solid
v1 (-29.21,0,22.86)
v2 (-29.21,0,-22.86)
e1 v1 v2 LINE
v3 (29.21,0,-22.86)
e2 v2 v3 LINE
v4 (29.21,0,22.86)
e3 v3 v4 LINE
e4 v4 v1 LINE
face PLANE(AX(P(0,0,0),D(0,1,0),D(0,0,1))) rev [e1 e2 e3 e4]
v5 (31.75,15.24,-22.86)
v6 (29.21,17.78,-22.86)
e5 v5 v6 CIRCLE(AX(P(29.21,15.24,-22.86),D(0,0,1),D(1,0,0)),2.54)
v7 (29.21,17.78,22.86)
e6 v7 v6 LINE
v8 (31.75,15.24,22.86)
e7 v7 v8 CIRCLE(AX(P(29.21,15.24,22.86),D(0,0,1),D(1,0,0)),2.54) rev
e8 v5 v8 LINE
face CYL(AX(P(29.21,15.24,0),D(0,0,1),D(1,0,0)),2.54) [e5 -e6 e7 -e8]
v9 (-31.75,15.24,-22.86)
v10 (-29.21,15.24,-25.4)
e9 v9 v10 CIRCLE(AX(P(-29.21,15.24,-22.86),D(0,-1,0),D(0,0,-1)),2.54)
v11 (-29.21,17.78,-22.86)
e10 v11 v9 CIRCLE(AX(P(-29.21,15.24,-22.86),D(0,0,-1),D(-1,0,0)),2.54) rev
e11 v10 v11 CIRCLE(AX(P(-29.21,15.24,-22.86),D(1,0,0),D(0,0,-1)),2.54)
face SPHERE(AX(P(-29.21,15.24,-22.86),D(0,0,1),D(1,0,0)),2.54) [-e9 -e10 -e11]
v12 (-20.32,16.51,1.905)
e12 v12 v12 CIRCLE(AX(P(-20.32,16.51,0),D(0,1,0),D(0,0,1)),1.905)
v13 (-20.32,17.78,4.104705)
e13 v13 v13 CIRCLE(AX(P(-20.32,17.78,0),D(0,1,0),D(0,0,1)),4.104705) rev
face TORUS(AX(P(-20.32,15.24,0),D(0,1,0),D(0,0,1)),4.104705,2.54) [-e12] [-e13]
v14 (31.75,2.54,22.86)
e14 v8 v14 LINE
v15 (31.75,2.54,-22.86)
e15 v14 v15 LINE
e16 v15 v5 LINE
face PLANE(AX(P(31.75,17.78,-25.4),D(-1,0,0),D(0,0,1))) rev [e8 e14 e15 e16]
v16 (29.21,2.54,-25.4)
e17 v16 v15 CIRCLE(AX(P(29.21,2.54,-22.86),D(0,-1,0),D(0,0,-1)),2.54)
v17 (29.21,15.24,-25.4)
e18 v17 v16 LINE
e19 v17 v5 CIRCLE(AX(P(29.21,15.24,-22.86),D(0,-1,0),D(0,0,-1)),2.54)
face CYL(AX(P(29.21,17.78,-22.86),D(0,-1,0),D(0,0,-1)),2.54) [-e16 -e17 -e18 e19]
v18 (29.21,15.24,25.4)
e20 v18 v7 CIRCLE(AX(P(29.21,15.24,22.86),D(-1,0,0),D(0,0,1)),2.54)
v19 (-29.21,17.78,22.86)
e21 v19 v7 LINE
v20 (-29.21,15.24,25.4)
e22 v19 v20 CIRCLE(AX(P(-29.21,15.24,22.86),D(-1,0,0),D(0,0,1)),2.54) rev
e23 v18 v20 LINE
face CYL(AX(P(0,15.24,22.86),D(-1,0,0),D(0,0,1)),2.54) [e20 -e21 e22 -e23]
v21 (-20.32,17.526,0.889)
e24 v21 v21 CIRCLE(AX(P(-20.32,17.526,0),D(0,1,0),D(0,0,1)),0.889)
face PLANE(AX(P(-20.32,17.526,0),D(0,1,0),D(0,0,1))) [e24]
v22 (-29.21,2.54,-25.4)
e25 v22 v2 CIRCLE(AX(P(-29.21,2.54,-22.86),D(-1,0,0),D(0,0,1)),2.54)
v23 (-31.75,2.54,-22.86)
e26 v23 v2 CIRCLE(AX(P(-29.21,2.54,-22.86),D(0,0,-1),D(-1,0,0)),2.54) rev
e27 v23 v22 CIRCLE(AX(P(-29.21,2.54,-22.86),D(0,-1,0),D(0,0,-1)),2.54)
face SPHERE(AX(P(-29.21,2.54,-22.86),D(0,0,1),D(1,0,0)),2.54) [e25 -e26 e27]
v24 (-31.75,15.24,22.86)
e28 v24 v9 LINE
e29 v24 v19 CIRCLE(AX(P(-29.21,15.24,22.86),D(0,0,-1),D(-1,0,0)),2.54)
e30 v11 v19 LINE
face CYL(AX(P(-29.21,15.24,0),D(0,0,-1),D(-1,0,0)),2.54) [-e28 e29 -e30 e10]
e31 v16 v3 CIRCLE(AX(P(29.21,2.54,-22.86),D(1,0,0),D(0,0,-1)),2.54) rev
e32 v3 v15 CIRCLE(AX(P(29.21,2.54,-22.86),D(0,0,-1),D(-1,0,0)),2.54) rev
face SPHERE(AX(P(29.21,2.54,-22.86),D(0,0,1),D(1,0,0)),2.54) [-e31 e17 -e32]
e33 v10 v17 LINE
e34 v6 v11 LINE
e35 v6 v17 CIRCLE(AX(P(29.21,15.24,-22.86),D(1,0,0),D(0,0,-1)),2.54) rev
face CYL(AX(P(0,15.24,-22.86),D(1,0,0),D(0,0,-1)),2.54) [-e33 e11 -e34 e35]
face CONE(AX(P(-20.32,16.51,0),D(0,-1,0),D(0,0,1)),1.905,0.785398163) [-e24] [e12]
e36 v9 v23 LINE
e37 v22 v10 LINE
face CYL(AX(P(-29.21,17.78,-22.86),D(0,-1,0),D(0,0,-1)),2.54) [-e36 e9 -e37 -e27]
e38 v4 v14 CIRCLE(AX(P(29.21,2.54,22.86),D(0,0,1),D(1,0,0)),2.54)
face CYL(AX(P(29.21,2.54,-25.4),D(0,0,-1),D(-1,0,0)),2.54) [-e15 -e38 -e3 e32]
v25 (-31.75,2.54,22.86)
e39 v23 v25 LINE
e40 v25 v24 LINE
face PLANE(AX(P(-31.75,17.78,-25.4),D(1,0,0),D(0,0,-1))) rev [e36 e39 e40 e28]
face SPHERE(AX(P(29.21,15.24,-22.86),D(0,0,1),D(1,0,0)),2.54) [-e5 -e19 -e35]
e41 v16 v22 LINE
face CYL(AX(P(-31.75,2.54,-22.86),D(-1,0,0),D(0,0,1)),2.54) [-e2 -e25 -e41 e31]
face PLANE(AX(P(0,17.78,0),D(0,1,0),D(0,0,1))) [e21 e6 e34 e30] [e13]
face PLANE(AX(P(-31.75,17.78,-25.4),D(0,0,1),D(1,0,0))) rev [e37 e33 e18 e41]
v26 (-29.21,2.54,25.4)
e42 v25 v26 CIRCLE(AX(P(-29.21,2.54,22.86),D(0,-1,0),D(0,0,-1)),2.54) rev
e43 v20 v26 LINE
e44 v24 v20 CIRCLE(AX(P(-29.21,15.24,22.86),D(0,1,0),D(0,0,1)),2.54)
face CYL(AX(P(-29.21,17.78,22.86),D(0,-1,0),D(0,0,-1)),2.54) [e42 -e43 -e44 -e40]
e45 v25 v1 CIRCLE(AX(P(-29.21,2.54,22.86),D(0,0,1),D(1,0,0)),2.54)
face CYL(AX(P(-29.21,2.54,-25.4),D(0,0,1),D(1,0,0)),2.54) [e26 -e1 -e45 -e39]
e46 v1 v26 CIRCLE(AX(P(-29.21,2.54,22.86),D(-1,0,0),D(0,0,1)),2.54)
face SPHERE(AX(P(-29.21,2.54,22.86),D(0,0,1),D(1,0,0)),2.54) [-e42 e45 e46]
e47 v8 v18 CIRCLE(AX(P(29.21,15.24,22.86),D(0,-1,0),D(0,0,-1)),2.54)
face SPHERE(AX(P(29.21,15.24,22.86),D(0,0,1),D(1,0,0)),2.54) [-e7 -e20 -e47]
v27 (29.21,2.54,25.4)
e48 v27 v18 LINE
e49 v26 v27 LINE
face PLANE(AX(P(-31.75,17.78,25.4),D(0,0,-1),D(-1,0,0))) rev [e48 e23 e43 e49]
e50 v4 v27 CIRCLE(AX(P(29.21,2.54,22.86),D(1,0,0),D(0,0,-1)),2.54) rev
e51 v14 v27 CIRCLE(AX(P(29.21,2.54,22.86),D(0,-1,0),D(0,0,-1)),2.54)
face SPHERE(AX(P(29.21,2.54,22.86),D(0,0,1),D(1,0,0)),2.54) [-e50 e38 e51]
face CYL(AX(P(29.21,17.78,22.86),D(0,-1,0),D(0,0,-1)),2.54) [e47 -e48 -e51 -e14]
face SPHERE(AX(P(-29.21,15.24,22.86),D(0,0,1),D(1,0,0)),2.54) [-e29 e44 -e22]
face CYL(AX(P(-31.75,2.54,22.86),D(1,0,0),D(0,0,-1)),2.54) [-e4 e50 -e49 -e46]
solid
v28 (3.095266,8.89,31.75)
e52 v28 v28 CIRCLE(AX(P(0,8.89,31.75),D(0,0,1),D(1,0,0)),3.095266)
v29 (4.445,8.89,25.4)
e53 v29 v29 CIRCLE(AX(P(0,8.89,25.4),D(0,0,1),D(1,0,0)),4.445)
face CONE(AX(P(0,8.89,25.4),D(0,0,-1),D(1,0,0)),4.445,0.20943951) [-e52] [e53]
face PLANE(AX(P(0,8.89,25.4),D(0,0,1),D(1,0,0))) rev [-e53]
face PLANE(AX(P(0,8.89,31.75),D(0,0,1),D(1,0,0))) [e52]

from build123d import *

# Parameters (mm, degrees)
SKETCH1_W           = 63.5
SKETCH1_H           = 50.8
BOSS_EXTRUDE1_DEPTH = 17.78
SKETCH2_R           = 4.445
BOSS_EXTRUDE2_DEPTH = 6.35
BOSS_EXTRUDE2_TAPER = 12
SKETCH3_R           = 1.905
CUT_EXTRUDE1_DEPTH  = 1.27
SKETCH4_R           = 1.905
BOSS_EXTRUDE3_DEPTH = 1.016
BOSS_EXTRUDE3_TAPER = 45
FILLET1_R           = 2.54
FILLET2_R           = 2.54


with BuildPart() as part:
    # Sketch1 → Boss-Extrude1 (new body)
    with BuildSketch(Plane(origin=(0, 0, 0), x_dir=(1, 0, 0), z_dir=(0, 1, 0))):
        Rectangle(SKETCH1_W, SKETCH1_H)
    extrude(amount=BOSS_EXTRUDE1_DEPTH)

    # Sketch3 → Cut-Extrude1 (cut)
    with BuildSketch(Plane(origin=(0, 17.78, 0), x_dir=(1, 0, 0), z_dir=(0, 1, 0))):
        with Locations(Location((-20.32, 0, 0), (0, 0, 270))):
            Circle(SKETCH3_R)
    extrude(amount=-CUT_EXTRUDE1_DEPTH, mode=Mode.SUBTRACT)

    # Sketch4 → Boss-Extrude3 (add)
    with BuildSketch(Plane(origin=(0, 16.51, 0), x_dir=(1, 0, 0), z_dir=(0, 1, 0))):
        with Locations(Location((-20.32, 0, 0), (0, 0, 270))):
            Circle(SKETCH4_R)
    extrude(amount=BOSS_EXTRUDE3_DEPTH, taper=BOSS_EXTRUDE3_TAPER)

    # Fillet1
    # the kernel refuses this fillet: 2.54 mm, written as the material it takes off along each edge
    with BuildSketch(Plane(origin=(-31.75, 17.78, 31.75), x_dir=(0, -1, 0), z_dir=(0, 0, -1)), Plane(origin=(31.75, 17.78, -31.75), x_dir=(0, -1, 0), z_dir=(0, 0, 1))) as fillet1_piece_1:
        with BuildLine():
            CenterArc((FILLET1_R, -FILLET1_R), FILLET1_R, 90, 90)
            Line((0, -FILLET1_R), (0, 0))
            Line((0, 0), (FILLET1_R, 0))
        make_face()
    extrude(amount=63.5, mode=Mode.SUBTRACT)
    with BuildSketch(Plane(origin=(38.1, 17.78, 25.4), x_dir=(0, 0, -1), z_dir=(-1, 0, 0))) as fillet1_piece_2:
        with BuildLine():
            CenterArc((FILLET1_R, FILLET1_R), FILLET1_R, 180, 90)
            Line((0, FILLET1_R), (0, 0))
            Line((0, 0), (FILLET1_R, 0))
        make_face()
    extrude(amount=76.2, mode=Mode.SUBTRACT)
    with BuildSketch(Plane(origin=(-20.32, 17.78, 0), x_dir=(0, 0, 1), z_dir=(-1, 0, 0))) as fillet1_piece_3:
        with BuildLine():
            CenterArc((4.104704526, -2.54), FILLET1_R, 90, 60)
            Line((1.905, -1.27), (1.905, 0))
            Line((1.905, 0), (4.104704526, 0))
        make_face()
    revolve(axis=Axis((-20.32, 17.78, 0), (0, 1, 0)), mode=Mode.SUBTRACT)
    with BuildSketch(Plane(origin=(-38.1, 17.78, -25.4), x_dir=(0, -1, 0), z_dir=(1, 0, 0))) as fillet1_piece_4:
        with BuildLine():
            CenterArc((FILLET1_R, -FILLET1_R), FILLET1_R, 90, 90)
            Line((0, -FILLET1_R), (0, 0))
            Line((0, 0), (FILLET1_R, 0))
        make_face()
    extrude(amount=76.2, mode=Mode.SUBTRACT)

    # Fillet2
    # the kernel refuses this fillet: 2.54 mm, written as the material it takes off along each edge
    with BuildSketch(Plane(origin=(-29.21, 15.24, -22.86), x_dir=(-1, 0, 0), z_dir=(0, 0, -1))) as fillet2_piece_1_section:
        Polygon((0, 0), (FILLET2_R, 0), (FILLET2_R, FILLET2_R), (0, FILLET2_R), align=None)
    fillet2_piece_1 = extrude(amount=FILLET2_R, mode=Mode.PRIVATE)
    fillet2_piece_1 = fillet2_piece_1 - Plane(origin=(-29.21, 15.24, -22.86), x_dir=(0.7071067811865475, -0.7071067811865475, 0), z_dir=(0, 0, -1)) * Sphere(FILLET2_R, mode=Mode.PRIVATE)
    add(fillet2_piece_1, mode=Mode.SUBTRACT)
    with BuildSketch(Plane(origin=(29.21, 15.24, -22.86), x_dir=(1, 0, 0), z_dir=(0, 0, -1))) as fillet2_piece_2_section:
        Polygon((0, 0), (FILLET2_R, 0), (FILLET2_R, -FILLET2_R), (0, -FILLET2_R), align=None)
    fillet2_piece_2 = extrude(amount=FILLET2_R, mode=Mode.PRIVATE)
    fillet2_piece_2 = fillet2_piece_2 - Plane(origin=(29.21, 15.24, -22.86), x_dir=(-0.7071067811865475, -0.7071067811865475, 0), z_dir=(0, 0, -1)) * Sphere(FILLET2_R, mode=Mode.PRIVATE)
    add(fillet2_piece_2, mode=Mode.SUBTRACT)
    with BuildSketch(Plane(origin=(-29.21, 15.24, 22.86), x_dir=(0, 0, 1), z_dir=(-1, 0, 0))) as fillet2_piece_3_section:
        Polygon((0, 0), (FILLET2_R, 0), (FILLET2_R, FILLET2_R), (0, FILLET2_R), align=None)
    fillet2_piece_3 = extrude(amount=FILLET2_R, mode=Mode.PRIVATE)
    fillet2_piece_3 = fillet2_piece_3 - Plane(origin=(-29.21, 15.24, 22.86), x_dir=(0, -0.7071067811865475, -0.7071067811865475), z_dir=(-1, 0, 0)) * Sphere(FILLET2_R, mode=Mode.PRIVATE)
    add(fillet2_piece_3, mode=Mode.SUBTRACT)
    with BuildSketch(Plane(origin=(29.21, 15.24, 22.86), x_dir=(0, 0, 1), z_dir=(1, 0, 0))) as fillet2_piece_4_section:
        Polygon((0, 0), (FILLET2_R, 0), (FILLET2_R, -FILLET2_R), (0, -FILLET2_R), align=None)
    fillet2_piece_4 = extrude(amount=FILLET2_R, mode=Mode.PRIVATE)
    fillet2_piece_4 = fillet2_piece_4 - Plane(origin=(29.21, 15.24, 22.86), x_dir=(0, -0.7071067811865475, -0.7071067811865475), z_dir=(1, 0, 0)) * Sphere(FILLET2_R, mode=Mode.PRIVATE)
    add(fillet2_piece_4, mode=Mode.SUBTRACT)
    with BuildSketch(Plane(origin=(29.21, 2.54, 22.86), x_dir=(1, 0, 0), z_dir=(0, -1, 0))) as fillet2_piece_5_section:
        Polygon((0, 0), (FILLET2_R, 0), (FILLET2_R, FILLET2_R), (0, FILLET2_R), align=None)
    fillet2_piece_5 = extrude(amount=FILLET2_R, mode=Mode.PRIVATE)
    fillet2_piece_5 = fillet2_piece_5 - Plane(origin=(29.21, 2.54, 22.86), x_dir=(-0.7071067811865475, 0, -0.7071067811865475), z_dir=(0, -1, 0)) * Sphere(FILLET2_R, mode=Mode.PRIVATE)
    add(fillet2_piece_5, mode=Mode.SUBTRACT)
    with BuildSketch(Plane(origin=(-29.21, 2.54, 22.86), x_dir=(-1, 0, 0), z_dir=(0, -1, 0))) as fillet2_piece_6_section:
        Polygon((0, 0), (FILLET2_R, 0), (FILLET2_R, -FILLET2_R), (0, -FILLET2_R), align=None)
    fillet2_piece_6 = extrude(amount=FILLET2_R, mode=Mode.PRIVATE)
    fillet2_piece_6 = fillet2_piece_6 - Plane(origin=(-29.21, 2.54, 22.86), x_dir=(0.7071067811865475, 0, -0.7071067811865477), z_dir=(0, -1, 0)) * Sphere(FILLET2_R, mode=Mode.PRIVATE)
    add(fillet2_piece_6, mode=Mode.SUBTRACT)
    with BuildSketch(Plane(origin=(-29.21, 2.54, -22.86), x_dir=(0, -1, 0), z_dir=(0, 0, -1))) as fillet2_piece_7_section:
        Polygon((0, 0), (FILLET2_R, 0), (FILLET2_R, FILLET2_R), (0, FILLET2_R), align=None)
    fillet2_piece_7 = extrude(amount=FILLET2_R, mode=Mode.PRIVATE)
    fillet2_piece_7 = fillet2_piece_7 - Plane(origin=(-29.21, 2.54, -22.86), x_dir=(0.7071067811865475, 0.7071067811865475, 0), z_dir=(0, 0, -1)) * Sphere(FILLET2_R, mode=Mode.PRIVATE)
    add(fillet2_piece_7, mode=Mode.SUBTRACT)
    with BuildSketch(Plane(origin=(29.21, 2.54, -22.86), x_dir=(0, -1, 0), z_dir=(0, 0, -1))) as fillet2_piece_8_section:
        Polygon((0, 0), (FILLET2_R, 0), (FILLET2_R, -FILLET2_R), (0, -FILLET2_R), align=None)
    fillet2_piece_8 = extrude(amount=FILLET2_R, mode=Mode.PRIVATE)
    fillet2_piece_8 = fillet2_piece_8 - Plane(origin=(29.21, 2.54, -22.86), x_dir=(-0.7071067811865475, 0.7071067811865475, 0), z_dir=(0, 0, -1)) * Sphere(FILLET2_R, mode=Mode.PRIVATE)
    add(fillet2_piece_8, mode=Mode.SUBTRACT)
    with BuildSketch(Plane(origin=(31.75, 2.54, 25.4), x_dir=(0, 0, -1), z_dir=(0, 1, 0)), Plane(origin=(31.75, 2.54, -25.4), x_dir=(-1, 0, 0), z_dir=(0, 1, 0))) as fillet2_piece_9:
        with BuildLine():
            CenterArc((FILLET2_R, FILLET2_R), FILLET2_R, 180, 90)
            Line((0, FILLET2_R), (0, 0))
            Line((0, 0), (FILLET2_R, 0))
        make_face()
    extrude(amount=12.7, mode=Mode.SUBTRACT)
    with BuildSketch(Plane(origin=(-31.75, 2.54, 25.4), x_dir=(0, 0, -1), z_dir=(0, 1, 0)), Plane(origin=(-31.75, 2.54, -25.4), x_dir=(1, 0, 0), z_dir=(0, 1, 0))) as fillet2_piece_10:
        with BuildLine():
            CenterArc((FILLET2_R, -FILLET2_R), FILLET2_R, 90, 90)
            Line((0, -FILLET2_R), (0, 0))
            Line((0, 0), (FILLET2_R, 0))
        make_face()
    extrude(amount=12.7, mode=Mode.SUBTRACT)
    with BuildSketch(Plane(origin=(29.21, 0, 25.4), x_dir=(0, 0, -1), z_dir=(-1, 0, 0))) as fillet2_piece_11:
        with BuildLine():
            CenterArc((FILLET2_R, -FILLET2_R), FILLET2_R, 90, 90)
            Line((0, -FILLET2_R), (0, 0))
            Line((0, 0), (FILLET2_R, 0))
        make_face()
    extrude(amount=58.42, mode=Mode.SUBTRACT)
    with BuildSketch(Plane(origin=(-31.75, 0, 22.86), x_dir=(1, 0, 0), z_dir=(0, 0, -1)), Plane(origin=(31.75, 0, -22.86), x_dir=(-1, 0, 0), z_dir=(0, 0, 1))) as fillet2_piece_12:
        with BuildLine():
            CenterArc((FILLET2_R, -FILLET2_R), FILLET2_R, 90, 90)
            Line((0, -FILLET2_R), (0, 0))
            Line((0, 0), (FILLET2_R, 0))
        make_face()
    extrude(amount=45.72, mode=Mode.SUBTRACT)
    with BuildSketch(Plane(origin=(-29.21, 0, -25.4), x_dir=(0, 1, 0), z_dir=(1, 0, 0))) as fillet2_piece_13:
        with BuildLine():
            CenterArc((FILLET2_R, FILLET2_R), FILLET2_R, 180, 90)
            Line((0, FILLET2_R), (0, 0))
            Line((0, 0), (FILLET2_R, 0))
        make_face()
    extrude(amount=58.42, mode=Mode.SUBTRACT)


with BuildPart() as body_2:
    # Sketch2 → Boss-Extrude2 (new body)
    with BuildSketch(Plane.XY.offset(25.4)):
        with Locations((0, 8.89)):
            Circle(SKETCH2_R)
    extrude(amount=BOSS_EXTRUDE2_DEPTH, taper=BOSS_EXTRUDE2_TAPER)


solid = Compound([part.part, body_2.part])
